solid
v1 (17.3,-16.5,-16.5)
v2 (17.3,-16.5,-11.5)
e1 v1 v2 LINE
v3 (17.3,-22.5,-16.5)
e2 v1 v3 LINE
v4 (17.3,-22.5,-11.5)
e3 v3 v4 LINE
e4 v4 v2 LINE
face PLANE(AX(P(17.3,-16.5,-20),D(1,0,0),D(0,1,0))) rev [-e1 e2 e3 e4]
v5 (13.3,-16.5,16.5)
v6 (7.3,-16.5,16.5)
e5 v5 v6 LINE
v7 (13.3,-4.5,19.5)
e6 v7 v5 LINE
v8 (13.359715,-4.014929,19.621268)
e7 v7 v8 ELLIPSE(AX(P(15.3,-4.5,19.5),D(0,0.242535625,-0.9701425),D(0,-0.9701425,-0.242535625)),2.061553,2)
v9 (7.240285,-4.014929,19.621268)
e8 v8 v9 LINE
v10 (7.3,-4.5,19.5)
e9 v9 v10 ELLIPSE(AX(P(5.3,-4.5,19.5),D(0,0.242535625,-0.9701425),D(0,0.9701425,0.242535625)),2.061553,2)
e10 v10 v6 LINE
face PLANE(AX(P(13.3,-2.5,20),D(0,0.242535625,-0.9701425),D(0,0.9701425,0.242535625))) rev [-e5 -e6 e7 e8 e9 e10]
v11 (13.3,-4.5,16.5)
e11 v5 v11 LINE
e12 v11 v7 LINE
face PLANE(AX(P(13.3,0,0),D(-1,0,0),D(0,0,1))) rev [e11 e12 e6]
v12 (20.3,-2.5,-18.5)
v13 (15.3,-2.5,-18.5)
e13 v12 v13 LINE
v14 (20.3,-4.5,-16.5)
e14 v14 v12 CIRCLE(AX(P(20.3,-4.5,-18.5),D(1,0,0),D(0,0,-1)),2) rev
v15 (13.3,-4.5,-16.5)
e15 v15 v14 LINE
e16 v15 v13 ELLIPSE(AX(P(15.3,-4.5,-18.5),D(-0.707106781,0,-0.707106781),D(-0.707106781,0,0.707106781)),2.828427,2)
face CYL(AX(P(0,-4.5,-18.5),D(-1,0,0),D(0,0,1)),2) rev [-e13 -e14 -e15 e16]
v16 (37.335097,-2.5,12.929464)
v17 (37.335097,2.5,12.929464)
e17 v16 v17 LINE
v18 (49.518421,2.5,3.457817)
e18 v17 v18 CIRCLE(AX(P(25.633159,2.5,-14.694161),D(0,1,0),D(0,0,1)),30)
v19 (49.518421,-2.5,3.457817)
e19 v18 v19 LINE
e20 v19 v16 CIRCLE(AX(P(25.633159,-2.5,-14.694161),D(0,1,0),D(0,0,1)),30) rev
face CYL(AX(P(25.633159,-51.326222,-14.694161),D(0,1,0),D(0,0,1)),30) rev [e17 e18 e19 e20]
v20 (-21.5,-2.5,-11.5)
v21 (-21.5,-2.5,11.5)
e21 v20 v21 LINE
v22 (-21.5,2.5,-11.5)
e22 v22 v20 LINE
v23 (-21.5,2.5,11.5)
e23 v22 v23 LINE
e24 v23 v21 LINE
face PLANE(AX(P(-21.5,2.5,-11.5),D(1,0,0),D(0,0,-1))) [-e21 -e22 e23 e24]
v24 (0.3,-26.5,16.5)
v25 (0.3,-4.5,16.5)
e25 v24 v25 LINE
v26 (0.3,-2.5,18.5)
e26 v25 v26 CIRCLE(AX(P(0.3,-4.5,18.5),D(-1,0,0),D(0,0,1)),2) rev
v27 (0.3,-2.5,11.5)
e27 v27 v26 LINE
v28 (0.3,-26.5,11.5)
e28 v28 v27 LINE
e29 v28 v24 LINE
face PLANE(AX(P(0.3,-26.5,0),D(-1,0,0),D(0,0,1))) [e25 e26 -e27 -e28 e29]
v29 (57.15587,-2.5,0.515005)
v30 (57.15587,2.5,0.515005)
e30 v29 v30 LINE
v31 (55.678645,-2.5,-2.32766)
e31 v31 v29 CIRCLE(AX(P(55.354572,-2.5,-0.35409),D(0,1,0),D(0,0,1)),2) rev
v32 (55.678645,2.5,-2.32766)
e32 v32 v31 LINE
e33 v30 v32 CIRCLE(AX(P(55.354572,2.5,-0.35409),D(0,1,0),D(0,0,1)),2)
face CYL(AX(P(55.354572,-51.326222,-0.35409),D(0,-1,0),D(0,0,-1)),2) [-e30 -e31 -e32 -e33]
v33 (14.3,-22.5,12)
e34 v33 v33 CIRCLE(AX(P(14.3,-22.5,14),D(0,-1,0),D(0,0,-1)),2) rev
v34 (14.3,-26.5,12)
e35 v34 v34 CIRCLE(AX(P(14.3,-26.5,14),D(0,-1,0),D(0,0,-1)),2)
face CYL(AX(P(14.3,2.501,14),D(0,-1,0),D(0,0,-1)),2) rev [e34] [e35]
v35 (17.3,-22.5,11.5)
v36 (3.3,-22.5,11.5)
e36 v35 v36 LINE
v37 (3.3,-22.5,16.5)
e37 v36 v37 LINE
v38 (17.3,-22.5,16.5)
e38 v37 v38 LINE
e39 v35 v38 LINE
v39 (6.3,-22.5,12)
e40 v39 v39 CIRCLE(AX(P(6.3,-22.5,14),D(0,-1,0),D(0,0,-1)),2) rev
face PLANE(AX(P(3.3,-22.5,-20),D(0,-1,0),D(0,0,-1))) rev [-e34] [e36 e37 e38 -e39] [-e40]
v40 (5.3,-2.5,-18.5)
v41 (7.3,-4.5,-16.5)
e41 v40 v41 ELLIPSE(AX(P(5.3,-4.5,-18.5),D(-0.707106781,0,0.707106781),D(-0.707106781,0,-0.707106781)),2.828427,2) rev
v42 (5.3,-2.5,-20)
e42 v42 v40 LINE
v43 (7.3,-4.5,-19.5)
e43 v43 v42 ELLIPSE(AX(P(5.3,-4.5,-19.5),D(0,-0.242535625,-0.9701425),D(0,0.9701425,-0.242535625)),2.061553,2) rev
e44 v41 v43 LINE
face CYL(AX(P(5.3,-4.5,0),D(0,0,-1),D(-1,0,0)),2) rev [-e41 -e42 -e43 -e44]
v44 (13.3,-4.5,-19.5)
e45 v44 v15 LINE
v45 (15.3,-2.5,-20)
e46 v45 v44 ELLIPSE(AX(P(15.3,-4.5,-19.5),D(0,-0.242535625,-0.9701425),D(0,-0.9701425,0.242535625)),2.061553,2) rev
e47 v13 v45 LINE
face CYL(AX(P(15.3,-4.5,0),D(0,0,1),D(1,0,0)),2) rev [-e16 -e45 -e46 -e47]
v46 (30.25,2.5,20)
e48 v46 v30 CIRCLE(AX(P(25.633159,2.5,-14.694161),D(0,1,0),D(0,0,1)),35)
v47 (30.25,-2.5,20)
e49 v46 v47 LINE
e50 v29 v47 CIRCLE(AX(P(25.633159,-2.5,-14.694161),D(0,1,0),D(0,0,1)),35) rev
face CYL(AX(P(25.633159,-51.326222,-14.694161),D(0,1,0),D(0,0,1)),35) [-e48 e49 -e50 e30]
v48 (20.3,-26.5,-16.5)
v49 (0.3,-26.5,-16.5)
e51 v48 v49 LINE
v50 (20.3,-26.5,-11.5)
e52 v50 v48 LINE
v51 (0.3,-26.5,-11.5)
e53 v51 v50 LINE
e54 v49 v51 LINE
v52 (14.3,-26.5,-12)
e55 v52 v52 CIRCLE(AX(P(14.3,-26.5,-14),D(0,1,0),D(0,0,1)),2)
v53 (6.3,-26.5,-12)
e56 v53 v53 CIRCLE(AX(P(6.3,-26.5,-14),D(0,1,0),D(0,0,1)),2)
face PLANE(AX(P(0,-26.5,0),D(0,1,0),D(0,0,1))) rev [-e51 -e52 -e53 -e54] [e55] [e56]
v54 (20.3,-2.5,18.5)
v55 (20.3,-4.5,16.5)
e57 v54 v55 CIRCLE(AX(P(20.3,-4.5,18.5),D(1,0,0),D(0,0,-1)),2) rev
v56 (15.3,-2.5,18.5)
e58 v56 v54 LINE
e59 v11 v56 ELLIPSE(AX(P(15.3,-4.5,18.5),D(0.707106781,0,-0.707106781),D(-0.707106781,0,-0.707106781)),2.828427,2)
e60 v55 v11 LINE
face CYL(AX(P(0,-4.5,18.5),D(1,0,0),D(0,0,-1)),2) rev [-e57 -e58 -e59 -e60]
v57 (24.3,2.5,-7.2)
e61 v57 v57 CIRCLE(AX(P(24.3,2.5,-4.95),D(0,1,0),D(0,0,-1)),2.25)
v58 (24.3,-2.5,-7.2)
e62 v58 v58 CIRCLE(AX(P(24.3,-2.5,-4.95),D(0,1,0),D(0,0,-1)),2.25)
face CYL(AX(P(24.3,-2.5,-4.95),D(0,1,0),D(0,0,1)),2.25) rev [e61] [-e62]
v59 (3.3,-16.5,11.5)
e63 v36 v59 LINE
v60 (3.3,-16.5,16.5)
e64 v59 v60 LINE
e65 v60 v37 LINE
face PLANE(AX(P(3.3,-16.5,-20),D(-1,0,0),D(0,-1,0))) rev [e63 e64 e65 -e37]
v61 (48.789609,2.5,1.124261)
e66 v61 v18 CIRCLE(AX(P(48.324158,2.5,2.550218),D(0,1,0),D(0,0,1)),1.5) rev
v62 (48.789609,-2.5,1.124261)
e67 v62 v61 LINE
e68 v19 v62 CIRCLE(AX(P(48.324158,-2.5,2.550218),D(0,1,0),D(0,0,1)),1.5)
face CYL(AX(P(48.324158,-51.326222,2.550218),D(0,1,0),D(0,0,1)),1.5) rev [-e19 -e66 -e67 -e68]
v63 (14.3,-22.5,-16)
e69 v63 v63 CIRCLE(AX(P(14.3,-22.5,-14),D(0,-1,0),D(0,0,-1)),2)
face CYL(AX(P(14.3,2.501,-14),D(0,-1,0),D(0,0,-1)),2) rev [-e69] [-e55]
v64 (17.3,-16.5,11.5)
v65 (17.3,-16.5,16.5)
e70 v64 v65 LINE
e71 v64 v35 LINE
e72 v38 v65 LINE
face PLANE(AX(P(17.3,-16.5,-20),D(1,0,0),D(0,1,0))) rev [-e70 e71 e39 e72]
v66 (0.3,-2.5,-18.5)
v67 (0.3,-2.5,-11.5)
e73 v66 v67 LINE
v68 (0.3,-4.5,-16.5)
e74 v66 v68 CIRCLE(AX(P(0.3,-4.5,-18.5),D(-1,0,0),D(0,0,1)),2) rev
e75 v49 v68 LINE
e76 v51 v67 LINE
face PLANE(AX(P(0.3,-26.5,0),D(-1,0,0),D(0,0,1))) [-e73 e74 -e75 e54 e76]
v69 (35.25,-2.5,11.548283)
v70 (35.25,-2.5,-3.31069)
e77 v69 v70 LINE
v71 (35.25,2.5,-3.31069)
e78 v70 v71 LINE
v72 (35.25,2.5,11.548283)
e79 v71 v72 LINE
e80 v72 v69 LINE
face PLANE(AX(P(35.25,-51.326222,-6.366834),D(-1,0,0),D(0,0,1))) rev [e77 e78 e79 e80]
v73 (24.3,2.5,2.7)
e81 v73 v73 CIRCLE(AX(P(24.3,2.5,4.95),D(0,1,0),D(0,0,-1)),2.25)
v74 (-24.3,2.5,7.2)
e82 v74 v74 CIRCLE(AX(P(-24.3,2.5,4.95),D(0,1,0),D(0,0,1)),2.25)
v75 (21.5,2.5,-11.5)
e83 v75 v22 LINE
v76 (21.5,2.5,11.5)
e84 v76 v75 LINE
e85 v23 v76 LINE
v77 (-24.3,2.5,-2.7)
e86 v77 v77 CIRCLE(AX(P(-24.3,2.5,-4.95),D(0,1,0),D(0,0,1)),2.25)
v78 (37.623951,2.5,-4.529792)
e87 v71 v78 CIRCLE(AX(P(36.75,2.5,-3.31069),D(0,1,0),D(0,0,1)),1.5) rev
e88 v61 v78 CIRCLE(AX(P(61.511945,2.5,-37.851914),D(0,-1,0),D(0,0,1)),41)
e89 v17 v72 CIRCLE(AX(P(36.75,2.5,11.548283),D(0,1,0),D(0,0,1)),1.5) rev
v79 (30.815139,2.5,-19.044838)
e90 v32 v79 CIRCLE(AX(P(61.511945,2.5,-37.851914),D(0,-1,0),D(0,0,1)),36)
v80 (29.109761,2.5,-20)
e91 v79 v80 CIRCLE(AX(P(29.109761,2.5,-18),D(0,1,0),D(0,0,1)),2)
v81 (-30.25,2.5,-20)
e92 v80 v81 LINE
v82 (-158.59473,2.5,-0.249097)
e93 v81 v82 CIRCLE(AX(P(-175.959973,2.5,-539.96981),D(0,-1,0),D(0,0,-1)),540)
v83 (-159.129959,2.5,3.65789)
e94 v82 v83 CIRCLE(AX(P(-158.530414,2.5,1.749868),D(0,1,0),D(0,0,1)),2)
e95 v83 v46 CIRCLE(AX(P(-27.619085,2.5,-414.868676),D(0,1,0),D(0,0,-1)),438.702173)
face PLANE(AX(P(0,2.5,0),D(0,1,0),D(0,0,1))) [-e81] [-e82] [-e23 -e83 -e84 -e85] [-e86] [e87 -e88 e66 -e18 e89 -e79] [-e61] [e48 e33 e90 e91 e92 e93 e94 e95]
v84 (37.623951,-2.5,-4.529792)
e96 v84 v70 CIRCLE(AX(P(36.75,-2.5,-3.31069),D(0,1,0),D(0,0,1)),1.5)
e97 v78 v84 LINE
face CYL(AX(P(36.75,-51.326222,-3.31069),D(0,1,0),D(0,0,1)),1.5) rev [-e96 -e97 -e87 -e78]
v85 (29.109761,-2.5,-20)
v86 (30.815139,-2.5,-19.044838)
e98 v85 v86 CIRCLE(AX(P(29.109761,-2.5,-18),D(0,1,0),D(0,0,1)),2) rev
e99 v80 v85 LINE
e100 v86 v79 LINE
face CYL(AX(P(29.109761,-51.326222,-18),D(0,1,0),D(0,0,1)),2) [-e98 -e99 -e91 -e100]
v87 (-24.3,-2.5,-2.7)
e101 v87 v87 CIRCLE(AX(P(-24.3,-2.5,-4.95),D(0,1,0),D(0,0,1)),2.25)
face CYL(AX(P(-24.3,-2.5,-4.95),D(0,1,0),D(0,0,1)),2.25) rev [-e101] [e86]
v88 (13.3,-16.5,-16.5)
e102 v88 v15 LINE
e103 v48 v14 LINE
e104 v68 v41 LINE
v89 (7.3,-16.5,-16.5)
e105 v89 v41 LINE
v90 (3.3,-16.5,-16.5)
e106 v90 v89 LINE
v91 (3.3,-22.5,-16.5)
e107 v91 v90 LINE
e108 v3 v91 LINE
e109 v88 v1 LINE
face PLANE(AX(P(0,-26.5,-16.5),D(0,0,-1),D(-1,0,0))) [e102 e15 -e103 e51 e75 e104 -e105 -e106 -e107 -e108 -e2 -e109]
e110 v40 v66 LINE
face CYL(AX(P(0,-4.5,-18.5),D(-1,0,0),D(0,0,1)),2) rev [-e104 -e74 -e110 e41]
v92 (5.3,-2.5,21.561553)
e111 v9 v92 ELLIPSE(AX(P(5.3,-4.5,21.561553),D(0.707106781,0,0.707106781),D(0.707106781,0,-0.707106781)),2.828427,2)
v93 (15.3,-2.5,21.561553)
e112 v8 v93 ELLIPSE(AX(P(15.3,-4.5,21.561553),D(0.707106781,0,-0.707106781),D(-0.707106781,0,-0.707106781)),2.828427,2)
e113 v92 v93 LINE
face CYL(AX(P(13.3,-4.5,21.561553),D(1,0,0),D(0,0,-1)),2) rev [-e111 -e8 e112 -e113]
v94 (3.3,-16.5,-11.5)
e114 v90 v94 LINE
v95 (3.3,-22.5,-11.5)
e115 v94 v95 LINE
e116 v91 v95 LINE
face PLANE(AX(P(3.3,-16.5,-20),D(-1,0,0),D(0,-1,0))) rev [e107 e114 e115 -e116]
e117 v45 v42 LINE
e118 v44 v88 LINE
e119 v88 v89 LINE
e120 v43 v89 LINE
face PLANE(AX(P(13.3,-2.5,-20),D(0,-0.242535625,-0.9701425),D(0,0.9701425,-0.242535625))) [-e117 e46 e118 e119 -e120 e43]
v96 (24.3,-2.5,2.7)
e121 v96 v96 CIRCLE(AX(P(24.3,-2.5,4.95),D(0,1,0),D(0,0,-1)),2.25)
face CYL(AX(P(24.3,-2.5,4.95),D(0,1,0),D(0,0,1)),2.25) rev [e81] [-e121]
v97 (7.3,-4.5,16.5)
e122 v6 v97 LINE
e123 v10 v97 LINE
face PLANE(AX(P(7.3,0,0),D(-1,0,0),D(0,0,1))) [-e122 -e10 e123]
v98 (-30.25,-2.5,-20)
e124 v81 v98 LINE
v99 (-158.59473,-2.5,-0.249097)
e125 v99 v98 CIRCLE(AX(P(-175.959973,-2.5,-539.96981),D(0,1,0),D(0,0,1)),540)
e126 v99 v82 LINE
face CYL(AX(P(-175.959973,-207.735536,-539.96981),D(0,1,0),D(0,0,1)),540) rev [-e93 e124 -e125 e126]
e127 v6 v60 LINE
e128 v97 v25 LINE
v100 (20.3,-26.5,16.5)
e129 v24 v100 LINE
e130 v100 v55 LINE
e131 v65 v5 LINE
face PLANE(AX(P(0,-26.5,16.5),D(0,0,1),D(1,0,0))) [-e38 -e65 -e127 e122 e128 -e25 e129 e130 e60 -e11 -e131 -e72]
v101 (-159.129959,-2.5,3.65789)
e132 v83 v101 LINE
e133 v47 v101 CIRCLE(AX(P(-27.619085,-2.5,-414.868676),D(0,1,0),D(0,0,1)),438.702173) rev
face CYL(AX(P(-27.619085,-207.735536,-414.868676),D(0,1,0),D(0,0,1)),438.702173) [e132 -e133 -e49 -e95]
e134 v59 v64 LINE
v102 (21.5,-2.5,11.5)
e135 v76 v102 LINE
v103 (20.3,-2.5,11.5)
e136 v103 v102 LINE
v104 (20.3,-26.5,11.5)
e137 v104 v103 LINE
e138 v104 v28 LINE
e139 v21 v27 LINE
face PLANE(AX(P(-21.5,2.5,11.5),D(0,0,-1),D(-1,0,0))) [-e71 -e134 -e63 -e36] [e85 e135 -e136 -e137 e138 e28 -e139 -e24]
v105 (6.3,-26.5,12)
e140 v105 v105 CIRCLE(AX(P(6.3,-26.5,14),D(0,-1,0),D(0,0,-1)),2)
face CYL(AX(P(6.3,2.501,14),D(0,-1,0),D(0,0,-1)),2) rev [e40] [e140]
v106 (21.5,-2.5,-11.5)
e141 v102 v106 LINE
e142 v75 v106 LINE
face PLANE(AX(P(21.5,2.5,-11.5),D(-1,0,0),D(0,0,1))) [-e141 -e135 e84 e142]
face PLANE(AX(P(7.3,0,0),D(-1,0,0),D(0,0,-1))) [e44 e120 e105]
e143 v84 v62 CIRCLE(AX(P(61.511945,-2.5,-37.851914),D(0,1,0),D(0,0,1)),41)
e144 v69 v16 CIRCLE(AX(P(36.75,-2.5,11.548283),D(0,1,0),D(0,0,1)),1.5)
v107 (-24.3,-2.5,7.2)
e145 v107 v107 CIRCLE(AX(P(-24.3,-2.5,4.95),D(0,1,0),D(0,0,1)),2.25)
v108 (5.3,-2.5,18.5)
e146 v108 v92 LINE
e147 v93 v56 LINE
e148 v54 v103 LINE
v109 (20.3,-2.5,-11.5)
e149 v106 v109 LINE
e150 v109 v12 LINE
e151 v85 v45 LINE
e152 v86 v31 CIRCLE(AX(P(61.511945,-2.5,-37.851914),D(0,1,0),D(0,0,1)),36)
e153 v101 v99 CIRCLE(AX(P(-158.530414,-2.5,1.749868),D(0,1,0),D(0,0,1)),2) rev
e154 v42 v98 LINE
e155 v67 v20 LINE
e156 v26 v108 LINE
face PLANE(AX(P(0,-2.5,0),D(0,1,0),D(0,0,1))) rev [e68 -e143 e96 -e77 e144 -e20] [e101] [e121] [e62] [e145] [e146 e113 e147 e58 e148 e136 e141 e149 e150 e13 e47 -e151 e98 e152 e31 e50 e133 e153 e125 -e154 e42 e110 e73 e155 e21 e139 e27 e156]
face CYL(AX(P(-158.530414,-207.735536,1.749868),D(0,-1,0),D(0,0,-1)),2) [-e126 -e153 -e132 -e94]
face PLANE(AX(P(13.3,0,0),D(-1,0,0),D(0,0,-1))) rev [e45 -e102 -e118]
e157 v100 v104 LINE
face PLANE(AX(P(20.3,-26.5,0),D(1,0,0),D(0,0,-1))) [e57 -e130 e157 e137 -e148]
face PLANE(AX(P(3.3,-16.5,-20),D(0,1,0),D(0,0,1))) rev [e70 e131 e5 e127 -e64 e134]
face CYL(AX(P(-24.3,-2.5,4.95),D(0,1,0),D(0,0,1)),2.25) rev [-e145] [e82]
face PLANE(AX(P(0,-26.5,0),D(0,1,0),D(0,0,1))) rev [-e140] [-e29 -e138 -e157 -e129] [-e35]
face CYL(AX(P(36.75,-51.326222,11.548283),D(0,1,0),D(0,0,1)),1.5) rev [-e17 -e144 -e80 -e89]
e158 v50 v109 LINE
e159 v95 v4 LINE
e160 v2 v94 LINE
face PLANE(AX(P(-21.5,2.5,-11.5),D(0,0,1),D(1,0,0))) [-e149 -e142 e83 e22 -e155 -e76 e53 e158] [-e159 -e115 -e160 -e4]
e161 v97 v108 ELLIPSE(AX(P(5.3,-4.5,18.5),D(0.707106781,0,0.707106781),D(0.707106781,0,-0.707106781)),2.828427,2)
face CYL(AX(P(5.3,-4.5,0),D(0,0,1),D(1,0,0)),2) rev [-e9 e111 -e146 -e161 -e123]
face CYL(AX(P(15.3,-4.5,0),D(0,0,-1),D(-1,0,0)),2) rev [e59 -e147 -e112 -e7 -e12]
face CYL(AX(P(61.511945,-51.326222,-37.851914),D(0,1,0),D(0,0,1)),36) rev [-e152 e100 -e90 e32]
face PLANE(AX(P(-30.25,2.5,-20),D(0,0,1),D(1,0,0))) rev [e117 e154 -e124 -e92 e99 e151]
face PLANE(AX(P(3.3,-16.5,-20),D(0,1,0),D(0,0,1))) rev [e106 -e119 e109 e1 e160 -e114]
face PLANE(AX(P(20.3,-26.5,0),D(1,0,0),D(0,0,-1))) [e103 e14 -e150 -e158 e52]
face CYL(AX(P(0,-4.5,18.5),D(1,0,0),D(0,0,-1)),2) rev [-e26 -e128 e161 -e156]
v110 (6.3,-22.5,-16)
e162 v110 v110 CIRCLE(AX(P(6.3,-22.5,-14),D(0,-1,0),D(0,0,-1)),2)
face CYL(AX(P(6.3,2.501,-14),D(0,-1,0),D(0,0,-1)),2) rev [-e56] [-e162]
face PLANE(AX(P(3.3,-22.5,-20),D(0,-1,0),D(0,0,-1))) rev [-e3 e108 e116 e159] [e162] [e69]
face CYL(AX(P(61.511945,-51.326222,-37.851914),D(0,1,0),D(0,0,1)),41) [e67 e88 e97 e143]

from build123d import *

# Parameters (mm, degrees)
SKETCH1_W           = 60.5
SKETCH1_H           = 40
SKETCH1_W_2         = 43
SKETCH1_H_2         = 23
BOSS_EXTRUDE1_DEPTH = 2.5
BOSS_EXTRUDE2_DEPTH = 5
BOSS_EXTRUDE3_DEPTH = 5
SKETCH4_R           = 2.25
CUT_EXTRUDE1_DEPTH  = 172.982842356
BOSS_EXTRUDE4_START = -29
SKETCH6_W           = 20
SKETCH6_H           = 5
BOSS_EXTRUDE4_DEPTH = 24
SKETCH7_W           = 14
SKETCH7_H           = 6
CUT_EXTRUDE3_DEPTH  = 177.123713622
FILLET1_R           = 2
FILLET2_R           = 2
FILLET3_R           = 1.5
CUT_EXTRUDE4_REACH  = 166.861
SKETCH8_R           = 2
BOSS_EXTRUDE5_DEPTH = 3
FILLET4_R           = 2


with BuildPart() as part:
    # Sketch1 → Boss-Extrude1 (new, symmetric)
    with BuildSketch(Plane(origin=(0, 0, 0), x_dir=(1, 0, 0), z_dir=(0, 1, 0))):
        Rectangle(SKETCH1_W, SKETCH1_H)
        Rectangle(SKETCH1_W_2, SKETCH1_H_2, mode=Mode.SUBTRACT)
    extrude(amount=BOSS_EXTRUDE1_DEPTH, both=True)

    # Sketch2 → Boss-Extrude2 (add)
    with BuildSketch(Plane(origin=(0, 2.5, 0), x_dir=(1, 0, 0), z_dir=(0, 1, 0))):
        with BuildLine():
            Line((30.25, 20), (30.25, -20))
            ThreePointArc((30.25, -20), (47.256913802, -12.826981202), (58.25, 2))
            ThreePointArc((58.25, 2), (42.044671251, 7.569488613), (30.25, 20))
        make_face()
        with BuildLine():
            Line((35.25, 6.366833624), (35.25, -13.722672005))
            ThreePointArc((35.25, -13.722672005), (44.009484688, -9.018930074), (50.750559549, -1.710601274))
            ThreePointArc((50.750559549, -1.710601274), (42.564834707, 1.49249914), (35.25, 6.366833624))
        make_face(mode=Mode.SUBTRACT)
    extrude(amount=-BOSS_EXTRUDE2_DEPTH)

    # Sketch3 → Boss-Extrude3 (add)
    with BuildSketch(Plane(origin=(0, 2.5, 0), x_dir=(1, 0, 0), z_dir=(0, 1, 0))):
        with BuildLine():
            Line((-30.25, 20), (-30.25, -20))
            Line((-30.25, -20), (30.25, -20))
            ThreePointArc((30.25, -20), (-71.163797142, -21.66706635), (-170.25, 0))
            ThreePointArc((-170.25, 0), (-99.592440555, 5.397083884), (-30.25, 20))
        make_face()
    extrude(amount=-BOSS_EXTRUDE3_DEPTH)

    # Sketch4 → Cut-Extrude1 (cut, through all)
    with BuildSketch(Plane(origin=(0, 2.5, 0), x_dir=(1, 0, 0), z_dir=(0, 1, 0))):
        with Locations(Location((-24.3, 4.95, 0), (0, 0, 270))):
            Circle(SKETCH4_R)
        with Locations(Location((-24.3, -4.95, 0), (0, 0, 270))):
            Circle(SKETCH4_R)
        with Locations(Location((24.3, -4.95, 0), (0, 0, 90))):
            Circle(SKETCH4_R)
        with Locations(Location((24.3, 4.95, 0), (0, 0, 90))):
            Circle(SKETCH4_R)
    extrude(amount=-CUT_EXTRUDE1_DEPTH, mode=Mode.SUBTRACT)

    # Sketch6 → Boss-Extrude4 (add)
    with BuildSketch(Plane(origin=(0, 2.5, 0), x_dir=(1, 0, 0), z_dir=(0, 1, 0)).offset(BOSS_EXTRUDE4_START)):
        with Locations((10.3, 14)):
            Rectangle(SKETCH6_W, SKETCH6_H)
        with Locations((10.3, -14)):
            Rectangle(SKETCH6_W, SKETCH6_H)
    extrude(amount=BOSS_EXTRUDE4_DEPTH)

    # Sketch7 → Cut-Extrude3 (cut, through all)
    with BuildSketch(Plane.XY.offset(16.5)):
        with Locations((10.3, -19.5)):
            Rectangle(SKETCH7_W, SKETCH7_H)
    extrude(amount=-CUT_EXTRUDE3_DEPTH, mode=Mode.SUBTRACT)

    # Fillet1
    fillet1_edges = [part.edges().sort_by_distance(p)[0] for p in [
        (-170.25, 0, 0),
    ]]
    fillet(fillet1_edges, radius=FILLET1_R)

    # Fillet2
    fillet2_edges = [part.edges().sort_by_distance(p)[0] for p in [
        (58.25, 0, -2),
        (30.25, 0, -20),
    ]]
    fillet(fillet2_edges, radius=FILLET2_R)

    # Fillet3
    fillet3_edges = [part.edges().sort_by_distance(p)[0] for p in [
        (35.25, 0, -6.366833624),
        (35.25, 0, 13.722672005),
        (50.750559549, 0, 1.710601274),
    ]]
    fillet(fillet3_edges, radius=FILLET3_R)

    # Sketch8 → Cut-Extrude4 (cut, up to next)
    with BuildSketch(Plane.XZ.offset(26.5), mode=Mode.PRIVATE) as cut_extrude4_sk1:
        with Locations(Location((6.3, 14, 0), (0, 0, 270))):
            Circle(SKETCH8_R)
    cut_extrude4_tool1 = extrude(cut_extrude4_sk1.sketch, amount=-CUT_EXTRUDE4_REACH, mode=Mode.PRIVATE) & part.part
    # Sketch8 → Cut-Extrude4 (cut, up to next)
    with BuildSketch(Plane.XZ.offset(26.5), mode=Mode.PRIVATE) as cut_extrude4_sk2:
        with Locations(Location((14.3, 14, 0), (0, 0, 270))):
            Circle(SKETCH8_R)
    cut_extrude4_tool2 = extrude(cut_extrude4_sk2.sketch, amount=-CUT_EXTRUDE4_REACH, mode=Mode.PRIVATE) & part.part
    cut_extrude4_1 = cut_extrude4_tool1.solids().sort_by_distance((6.3, -26.5, 14))[0]
    add(cut_extrude4_1, mode=Mode.SUBTRACT)
    cut_extrude4_2 = cut_extrude4_tool2.solids().sort_by_distance((14.3, -26.5, 14))[0]
    add(cut_extrude4_2, mode=Mode.SUBTRACT)
    cut_extrude4 = cut_extrude4_1 + cut_extrude4_2  # Cut-Extrude4 as one shape, for the pattern or mirror that repeats it

    # Sketch9 → Boss-Extrude5 (add, symmetric)
    with BuildSketch(Plane(origin=(10.3, 0, 0), x_dir=(0, 0, -1), z_dir=(1, 0, 0))):
        Polygon((-20, -2.5), (-16.5, -16.5), (-16.5, -2.5), align=None)
    boss_extrude5 = extrude(amount=BOSS_EXTRUDE5_DEPTH, both=True)

    # Mirror1: Cut-Extrude4, Boss-Extrude5 across plane
    add(cut_extrude4.mirror(Plane.XY), mode=Mode.SUBTRACT)
    add(boss_extrude5.mirror(Plane.XY))

    # Fillet4
    # the kernel refuses this fillet: 2 mm, written as the material it adds along each edge
    with BuildSketch(Plane(origin=(20.3, -2.5, 16.5), x_dir=(0, 0, 1), z_dir=(-1, 0, 0)), Plane(origin=(0.3, -2.5, -16.5), x_dir=(0, 0, -1), z_dir=(1, 0, 0)), Plane(origin=(8.3, -2.5, -16.5), x_dir=(0, 0, -1), z_dir=(1, 0, 0)), Plane(origin=(12.3, -2.5, 16.5), x_dir=(0, 0, 1), z_dir=(-1, 0, 0))) as fillet4_piece_1:
        with BuildLine():
            CenterArc((FILLET4_R, -FILLET4_R), FILLET4_R, 90, 90)
            Line((0, -FILLET4_R), (0, 0))
            Line((0, 0), (FILLET4_R, 0))
        make_face()
    extrude(amount=12)
    with BuildSketch(Plane(origin=(7.3, -2.5, 11.5), x_dir=(-1, 0, 0), z_dir=(0, 0, 1))) as fillet4_piece_2_section:
        with BuildLine():
            CenterArc((FILLET4_R, FILLET4_R), FILLET4_R, 180, 90)
            Line((0, FILLET4_R), (0, 0))
            Line((0, 0), (FILLET4_R, 0))
        make_face()
    fillet4_piece_2 = extrude(amount=13.5, mode=Mode.PRIVATE)
    fillet4_piece_2 = split(fillet4_piece_2, bisect_by=Plane(origin=(6.847209771, -4.337920215, 19.540519946), z_dir=(0, 0.242535625036333, -0.9701425001453319)), keep=Keep.TOP, mode=Mode.PRIVATE)
    add(fillet4_piece_2)
    with BuildSketch(Plane(origin=(13.3, -2.5, 20), x_dir=(0, 0, 1), z_dir=(-1, 0, 0))) as fillet4_piece_3:
        with BuildLine():
            CenterArc((FILLET4_R * 0.780776406404, -FILLET4_R), FILLET4_R, 90, 75.963756532)
            Line((-FILLET4_R * 0.189366093741, -FILLET4_R * 0.757464374964), (0, 0))
            Line((0, 0), (FILLET4_R * 0.780776406404, 0))
        make_face()
    extrude(amount=6)
    with BuildSketch(Plane(origin=(13.3, -2.5, 11.5), x_dir=(1, 0, 0), z_dir=(0, 0, 1))) as fillet4_piece_4_section:
        with BuildLine():
            CenterArc((FILLET4_R, -FILLET4_R), FILLET4_R, 90, 90)
            Line((0, -FILLET4_R), (0, 0))
            Line((0, 0), (FILLET4_R, 0))
        make_face()
    fillet4_piece_4 = extrude(amount=13.5, mode=Mode.PRIVATE)
    fillet4_piece_4 = split(fillet4_piece_4, bisect_by=Plane(origin=(13.752790229, -4.337920215, 19.540519946), z_dir=(0, 0.242535625036333, -0.9701425001453319)), keep=Keep.TOP, mode=Mode.PRIVATE)
    add(fillet4_piece_4)
    with BuildSketch(Plane(origin=(13.3, -2.5, -11.5), x_dir=(1, 0, 0), z_dir=(0, 0, -1))) as fillet4_piece_5_section:
        with BuildLine():
            CenterArc((FILLET4_R, FILLET4_R), FILLET4_R, 180, 90)
            Line((0, FILLET4_R), (0, 0))
            Line((0, 0), (FILLET4_R, 0))
        make_face()
    fillet4_piece_5 = extrude(amount=8.5, mode=Mode.PRIVATE)
    fillet4_piece_5 = split(fillet4_piece_5, bisect_by=Plane(origin=(13.752790229, -4.337920215, -19.540519946), z_dir=(0, 0.242535625036333, 0.9701425001453319)), keep=Keep.TOP, mode=Mode.PRIVATE)
    add(fillet4_piece_5)
    with BuildSketch(Plane(origin=(7.3, -2.5, -11.5), x_dir=(-1, 0, 0), z_dir=(0, 0, -1))) as fillet4_piece_6_section:
        with BuildLine():
            CenterArc((FILLET4_R, -FILLET4_R), FILLET4_R, 90, 90)
            Line((0, -FILLET4_R), (0, 0))
            Line((0, 0), (FILLET4_R, 0))
        make_face()
    fillet4_piece_6 = extrude(amount=8.5, mode=Mode.PRIVATE)
    fillet4_piece_6 = split(fillet4_piece_6, bisect_by=Plane(origin=(6.847209771, -4.337920215, -19.540519946), z_dir=(0, 0.242535625036333, 0.9701425001453319)), keep=Keep.TOP, mode=Mode.PRIVATE)
    add(fillet4_piece_6)
    with BuildSketch(Plane(origin=(13.3, -2.5, 20), x_dir=(0, 0, 1), z_dir=(-1, 0, 0))) as fillet4_piece_7a_section:
        with BuildLine():
            CenterArc((FILLET4_R * 0.780776406404, -FILLET4_R), FILLET4_R, 90, 75.963756532)
            Line((-FILLET4_R * 0.189366093741, -FILLET4_R * 0.757464374964), (0, 0))
            Line((0, 0), (FILLET4_R * 0.780776406404, 0))
        make_face()
    fillet4_piece_7a = extrude(amount=9.903882032, mode=Mode.PRIVATE)
    fillet4_piece_7a = split(fillet4_piece_7a, bisect_by=Plane(origin=(7.3, -2.834860191, 20.261450936), z_dir=(-1, 0, 0)), keep=Keep.TOP, mode=Mode.PRIVATE)
    with BuildSketch(Plane(origin=(7.3, -2.5, 16.5), x_dir=(-1, 0, 0), z_dir=(0, 0, 1))) as fillet4_piece_7b_section:
        with BuildLine():
            CenterArc((FILLET4_R, FILLET4_R), FILLET4_R, 180, 90)
            Line((0, FILLET4_R), (0, 0))
            Line((0, 0), (FILLET4_R, 0))
        make_face()
    fillet4_piece_7b = extrude(amount=8.5, mode=Mode.PRIVATE)
    fillet4_piece_7b = fillet4_piece_7b & Plane(origin=(-27.619084703, -2.967404811, -414.868675855), x_dir=(0.1319097290212544, 0, 0.9912617330400378), z_dir=(0, 1, 0)) * Cylinder(438.702172555, 25, mode=Mode.PRIVATE)
    fillet4_piece_7b = split(fillet4_piece_7b, bisect_by=Plane(origin=(6.852193926, -2.662257848, 19.959435538), z_dir=(0, -0.242535625036333, 0.9701425001453319)), keep=Keep.TOP, mode=Mode.PRIVATE)
    fillet4_piece_7 = fillet4_piece_7a & fillet4_piece_7b
    add(fillet4_piece_7)
    with BuildSketch(Plane(origin=(13.3, -2.5, 16.5), x_dir=(1, 0, 0), z_dir=(0, 0, 1))) as fillet4_piece_8a_section:
        with BuildLine():
            CenterArc((FILLET4_R, -FILLET4_R), FILLET4_R, 90, 90)
            Line((0, -FILLET4_R), (0, 0))
            Line((0, 0), (FILLET4_R, 0))
        make_face()
    fillet4_piece_8a = extrude(amount=8.5, mode=Mode.PRIVATE)
    fillet4_piece_8a = fillet4_piece_8a & Plane(origin=(-27.619084703, -2.981369523, -414.868675855), x_dir=(0.1319097290212544, 0, 0.9912617330400378), z_dir=(0, 1, 0)) * Cylinder(438.702172555, 25, mode=Mode.PRIVATE)
    fillet4_piece_8a = split(fillet4_piece_8a, bisect_by=Plane(origin=(13.730097047, -2.74600268, 19.93849933), z_dir=(0, -0.242535625036333, 0.9701425001453319)), keep=Keep.TOP, mode=Mode.PRIVATE)
    with BuildSketch(Plane(origin=(17.203882032, -2.5, 20), x_dir=(0, 0, 1), z_dir=(-1, 0, 0))) as fillet4_piece_8b_section:
        with BuildLine():
            CenterArc((FILLET4_R * 0.780776406404, -FILLET4_R), FILLET4_R, 90, 75.963756532)
            Line((-FILLET4_R * 0.189366093741, -FILLET4_R * 0.757464374964), (0, 0))
            Line((0, 0), (FILLET4_R * 0.780776406404, 0))
        make_face()
    fillet4_piece_8b = extrude(amount=9.903882032, mode=Mode.PRIVATE)
    fillet4_piece_8b = fillet4_piece_8b & Plane(origin=(-27.619084703, -2.834877125, -414.868675855), x_dir=(0.1319097290212544, 0, 0.9912617330400378), z_dir=(0, 1, 0)) * Cylinder(438.702172555, 27, mode=Mode.PRIVATE)
    fillet4_piece_8b = split(fillet4_piece_8b, bisect_by=Plane(origin=(13.3, -2.834877125, 20.261389272), z_dir=(1, 0, 0)), keep=Keep.TOP, mode=Mode.PRIVATE)
    fillet4_piece_8 = fillet4_piece_8a & fillet4_piece_8b
    add(fillet4_piece_8)


solid = part.part
